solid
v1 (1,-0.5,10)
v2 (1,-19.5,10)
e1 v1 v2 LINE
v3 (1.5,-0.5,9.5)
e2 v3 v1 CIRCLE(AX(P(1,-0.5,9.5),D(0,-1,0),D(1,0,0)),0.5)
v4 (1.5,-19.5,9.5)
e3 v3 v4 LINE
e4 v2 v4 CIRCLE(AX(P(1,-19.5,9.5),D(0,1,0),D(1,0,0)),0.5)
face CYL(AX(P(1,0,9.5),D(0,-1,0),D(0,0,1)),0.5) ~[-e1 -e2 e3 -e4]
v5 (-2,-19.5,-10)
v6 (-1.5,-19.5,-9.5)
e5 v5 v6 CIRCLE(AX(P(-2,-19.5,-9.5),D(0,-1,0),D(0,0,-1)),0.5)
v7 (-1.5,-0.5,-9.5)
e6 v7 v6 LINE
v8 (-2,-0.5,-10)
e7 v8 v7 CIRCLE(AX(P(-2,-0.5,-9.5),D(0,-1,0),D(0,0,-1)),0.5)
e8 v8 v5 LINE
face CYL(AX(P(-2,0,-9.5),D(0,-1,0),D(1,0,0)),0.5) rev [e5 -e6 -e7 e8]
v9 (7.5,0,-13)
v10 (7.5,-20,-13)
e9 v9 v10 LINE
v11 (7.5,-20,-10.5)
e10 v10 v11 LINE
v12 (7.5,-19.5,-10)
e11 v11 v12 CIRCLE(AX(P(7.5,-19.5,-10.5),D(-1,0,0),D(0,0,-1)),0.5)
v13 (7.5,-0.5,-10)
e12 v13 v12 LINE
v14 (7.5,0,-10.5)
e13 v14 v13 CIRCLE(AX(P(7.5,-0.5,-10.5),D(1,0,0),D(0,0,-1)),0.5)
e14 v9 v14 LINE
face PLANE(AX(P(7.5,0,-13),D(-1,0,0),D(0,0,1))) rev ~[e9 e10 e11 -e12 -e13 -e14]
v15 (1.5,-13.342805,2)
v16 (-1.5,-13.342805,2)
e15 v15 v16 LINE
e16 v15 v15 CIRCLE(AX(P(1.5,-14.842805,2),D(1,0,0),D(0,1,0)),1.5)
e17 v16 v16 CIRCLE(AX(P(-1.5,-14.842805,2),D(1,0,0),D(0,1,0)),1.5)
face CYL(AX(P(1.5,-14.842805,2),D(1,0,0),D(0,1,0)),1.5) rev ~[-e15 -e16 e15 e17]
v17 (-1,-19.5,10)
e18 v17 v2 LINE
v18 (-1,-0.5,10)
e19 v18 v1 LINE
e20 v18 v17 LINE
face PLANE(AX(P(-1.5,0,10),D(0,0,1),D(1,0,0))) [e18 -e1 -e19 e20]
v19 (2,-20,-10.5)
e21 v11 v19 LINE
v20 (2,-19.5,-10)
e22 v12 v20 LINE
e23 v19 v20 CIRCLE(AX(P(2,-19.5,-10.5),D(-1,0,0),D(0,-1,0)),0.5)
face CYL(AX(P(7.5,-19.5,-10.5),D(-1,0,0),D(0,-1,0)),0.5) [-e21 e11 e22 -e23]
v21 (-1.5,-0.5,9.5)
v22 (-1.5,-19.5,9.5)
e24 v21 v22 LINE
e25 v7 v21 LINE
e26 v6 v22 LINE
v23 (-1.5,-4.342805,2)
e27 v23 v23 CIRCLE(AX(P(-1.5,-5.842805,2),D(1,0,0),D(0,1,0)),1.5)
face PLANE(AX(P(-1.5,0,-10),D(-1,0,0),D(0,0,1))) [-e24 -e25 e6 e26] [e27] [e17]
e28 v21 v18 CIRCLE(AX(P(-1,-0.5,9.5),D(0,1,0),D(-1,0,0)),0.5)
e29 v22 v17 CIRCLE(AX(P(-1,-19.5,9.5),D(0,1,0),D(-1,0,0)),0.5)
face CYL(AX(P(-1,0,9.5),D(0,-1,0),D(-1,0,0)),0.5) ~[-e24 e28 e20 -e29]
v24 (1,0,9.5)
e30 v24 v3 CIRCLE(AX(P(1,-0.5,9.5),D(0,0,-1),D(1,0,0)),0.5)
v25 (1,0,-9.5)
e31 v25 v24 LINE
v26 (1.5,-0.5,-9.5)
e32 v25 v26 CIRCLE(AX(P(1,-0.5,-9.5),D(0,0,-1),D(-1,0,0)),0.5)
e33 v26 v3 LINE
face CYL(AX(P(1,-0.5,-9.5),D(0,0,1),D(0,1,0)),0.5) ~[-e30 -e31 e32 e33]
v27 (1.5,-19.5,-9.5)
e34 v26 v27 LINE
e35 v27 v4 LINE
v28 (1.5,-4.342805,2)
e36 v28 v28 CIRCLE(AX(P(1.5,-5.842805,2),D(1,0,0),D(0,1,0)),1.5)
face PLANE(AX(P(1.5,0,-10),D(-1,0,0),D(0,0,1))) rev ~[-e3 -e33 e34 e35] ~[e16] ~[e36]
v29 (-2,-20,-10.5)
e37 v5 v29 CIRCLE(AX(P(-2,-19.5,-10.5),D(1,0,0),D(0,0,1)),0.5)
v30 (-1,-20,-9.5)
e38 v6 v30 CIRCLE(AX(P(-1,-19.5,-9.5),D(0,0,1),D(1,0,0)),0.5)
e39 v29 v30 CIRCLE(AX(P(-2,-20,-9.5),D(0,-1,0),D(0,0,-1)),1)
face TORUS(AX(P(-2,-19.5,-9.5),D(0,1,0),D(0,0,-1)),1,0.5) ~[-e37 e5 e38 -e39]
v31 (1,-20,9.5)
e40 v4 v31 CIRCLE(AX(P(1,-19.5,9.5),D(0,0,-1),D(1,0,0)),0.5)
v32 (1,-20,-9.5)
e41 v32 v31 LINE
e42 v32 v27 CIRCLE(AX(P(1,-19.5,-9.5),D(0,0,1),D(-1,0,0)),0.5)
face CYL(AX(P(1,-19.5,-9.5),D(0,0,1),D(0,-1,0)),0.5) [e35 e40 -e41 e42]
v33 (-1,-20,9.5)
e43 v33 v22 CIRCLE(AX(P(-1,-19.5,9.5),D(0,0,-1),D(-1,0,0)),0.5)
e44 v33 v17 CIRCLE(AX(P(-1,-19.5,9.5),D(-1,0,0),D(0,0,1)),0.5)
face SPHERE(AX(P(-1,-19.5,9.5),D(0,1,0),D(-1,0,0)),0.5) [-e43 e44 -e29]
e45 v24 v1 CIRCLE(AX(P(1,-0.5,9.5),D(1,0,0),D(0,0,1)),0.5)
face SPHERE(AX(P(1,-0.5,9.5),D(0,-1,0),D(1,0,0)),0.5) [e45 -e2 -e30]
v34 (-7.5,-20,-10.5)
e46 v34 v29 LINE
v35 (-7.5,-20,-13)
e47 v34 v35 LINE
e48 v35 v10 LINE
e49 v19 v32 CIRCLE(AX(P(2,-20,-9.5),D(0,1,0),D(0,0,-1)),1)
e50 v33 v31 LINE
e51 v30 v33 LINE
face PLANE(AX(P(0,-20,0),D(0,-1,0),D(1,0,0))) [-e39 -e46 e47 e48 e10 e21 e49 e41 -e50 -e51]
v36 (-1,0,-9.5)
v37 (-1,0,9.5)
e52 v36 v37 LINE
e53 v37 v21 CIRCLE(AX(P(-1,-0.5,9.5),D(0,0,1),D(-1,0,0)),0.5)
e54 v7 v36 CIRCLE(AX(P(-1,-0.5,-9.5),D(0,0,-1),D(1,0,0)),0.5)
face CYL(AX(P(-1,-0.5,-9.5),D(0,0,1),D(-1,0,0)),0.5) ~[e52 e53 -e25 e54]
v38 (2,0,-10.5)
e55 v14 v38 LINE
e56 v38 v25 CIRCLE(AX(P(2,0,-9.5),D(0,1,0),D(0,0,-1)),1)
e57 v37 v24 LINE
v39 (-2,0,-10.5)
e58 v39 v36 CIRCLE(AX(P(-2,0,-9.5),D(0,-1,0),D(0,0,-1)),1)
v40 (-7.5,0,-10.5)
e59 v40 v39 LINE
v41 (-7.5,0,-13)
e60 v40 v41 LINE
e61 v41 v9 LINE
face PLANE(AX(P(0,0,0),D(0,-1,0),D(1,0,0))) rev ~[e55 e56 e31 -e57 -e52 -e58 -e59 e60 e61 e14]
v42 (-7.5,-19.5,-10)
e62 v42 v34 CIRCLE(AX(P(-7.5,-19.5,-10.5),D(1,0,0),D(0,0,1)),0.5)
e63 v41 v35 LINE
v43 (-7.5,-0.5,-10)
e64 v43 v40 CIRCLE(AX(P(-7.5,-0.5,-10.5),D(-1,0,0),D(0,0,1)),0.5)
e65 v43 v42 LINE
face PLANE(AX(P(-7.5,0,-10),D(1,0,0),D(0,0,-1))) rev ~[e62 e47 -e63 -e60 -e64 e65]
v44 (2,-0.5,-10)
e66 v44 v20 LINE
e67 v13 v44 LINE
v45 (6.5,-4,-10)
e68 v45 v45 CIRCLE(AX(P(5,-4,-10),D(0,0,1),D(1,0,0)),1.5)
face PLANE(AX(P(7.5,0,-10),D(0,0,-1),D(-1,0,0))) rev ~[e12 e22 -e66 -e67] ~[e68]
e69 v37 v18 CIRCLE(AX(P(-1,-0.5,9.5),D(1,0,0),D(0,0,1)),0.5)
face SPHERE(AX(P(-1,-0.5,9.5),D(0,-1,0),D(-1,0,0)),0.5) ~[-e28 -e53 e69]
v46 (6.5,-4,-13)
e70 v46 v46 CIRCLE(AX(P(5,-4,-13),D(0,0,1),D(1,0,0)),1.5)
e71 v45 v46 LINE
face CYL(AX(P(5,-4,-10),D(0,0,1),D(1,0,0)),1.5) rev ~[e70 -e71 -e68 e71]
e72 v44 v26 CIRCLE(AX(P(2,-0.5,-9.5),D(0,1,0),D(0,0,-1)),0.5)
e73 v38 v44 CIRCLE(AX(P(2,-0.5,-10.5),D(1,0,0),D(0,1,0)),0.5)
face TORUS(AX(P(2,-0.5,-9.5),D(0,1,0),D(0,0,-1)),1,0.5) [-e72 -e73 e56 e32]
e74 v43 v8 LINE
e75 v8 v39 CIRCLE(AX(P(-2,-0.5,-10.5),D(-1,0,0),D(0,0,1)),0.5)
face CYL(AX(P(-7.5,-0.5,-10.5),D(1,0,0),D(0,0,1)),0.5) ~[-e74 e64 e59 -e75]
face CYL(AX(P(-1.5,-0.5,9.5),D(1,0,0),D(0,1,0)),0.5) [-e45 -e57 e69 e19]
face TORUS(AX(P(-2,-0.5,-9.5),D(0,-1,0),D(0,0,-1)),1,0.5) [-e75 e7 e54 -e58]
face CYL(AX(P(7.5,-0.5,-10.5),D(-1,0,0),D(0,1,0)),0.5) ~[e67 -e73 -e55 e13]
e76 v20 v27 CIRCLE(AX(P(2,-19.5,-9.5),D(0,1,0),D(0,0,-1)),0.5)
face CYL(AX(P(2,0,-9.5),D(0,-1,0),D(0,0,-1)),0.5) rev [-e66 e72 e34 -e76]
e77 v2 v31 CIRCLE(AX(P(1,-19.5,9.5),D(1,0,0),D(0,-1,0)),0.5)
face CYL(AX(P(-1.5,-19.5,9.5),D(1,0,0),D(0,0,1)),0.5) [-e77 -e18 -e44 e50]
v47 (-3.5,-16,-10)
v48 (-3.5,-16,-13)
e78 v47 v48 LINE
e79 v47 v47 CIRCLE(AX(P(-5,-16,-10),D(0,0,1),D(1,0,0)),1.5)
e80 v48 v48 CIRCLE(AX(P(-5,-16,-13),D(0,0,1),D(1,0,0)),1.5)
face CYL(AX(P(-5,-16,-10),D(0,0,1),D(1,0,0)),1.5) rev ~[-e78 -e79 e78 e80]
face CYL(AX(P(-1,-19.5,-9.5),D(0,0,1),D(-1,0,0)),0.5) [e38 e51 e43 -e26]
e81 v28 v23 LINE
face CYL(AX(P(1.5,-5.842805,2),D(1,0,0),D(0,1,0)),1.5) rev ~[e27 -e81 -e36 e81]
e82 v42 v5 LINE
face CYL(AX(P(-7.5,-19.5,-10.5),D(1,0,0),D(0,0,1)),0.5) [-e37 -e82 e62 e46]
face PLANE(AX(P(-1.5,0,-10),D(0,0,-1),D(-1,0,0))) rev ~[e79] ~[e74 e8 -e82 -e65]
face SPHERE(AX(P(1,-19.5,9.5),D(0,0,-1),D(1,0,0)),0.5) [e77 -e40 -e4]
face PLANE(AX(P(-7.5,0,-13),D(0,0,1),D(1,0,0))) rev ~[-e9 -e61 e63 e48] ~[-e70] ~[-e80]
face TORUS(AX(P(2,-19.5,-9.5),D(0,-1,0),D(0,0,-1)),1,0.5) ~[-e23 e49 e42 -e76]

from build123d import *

# Parameters (mm, degrees)
F0_W     = 3
F0_H     = 20
F1_DEPTH = 20
F2_R     = 1.5
F3_DEPTH = 9.001
F4_R     = 1.5
F5_DEPTH = 3.001
F6_R     = 1.5
F7_DEPTH = 25
F8_F1_R  = 0.5
F8_F2_R  = 0.5


with BuildPart() as f1:
    # F0 (on Front) → F1 (new body)
    with BuildSketch(Plane.XZ):
        Rectangle(F0_W, F0_H)
        Polygon((7.5, -10), (1.5, -10), (-1.5, -10), (-7.5, -10), (-7.5, -13), (7.5, -13), align=None)
    extrude(amount=F1_DEPTH)

    # F2 (on face) → F3 (cut, through all)
    with BuildSketch(Plane.YZ.offset(1.5)):
        with Locations((-14.8428049088, 2)):
            Circle(F2_R)
        with Locations((-5.8428049088, 2)):
            Circle(F2_R)
    extrude(amount=-F3_DEPTH, mode=Mode.SUBTRACT)

    # F4 (on face) → F5 (cut, through all)
    with BuildSketch(Plane.XY.offset(-10)):
        with Locations((5, -4)):
            Circle(F4_R)
    extrude(amount=-F5_DEPTH, mode=Mode.SUBTRACT)

    # F6 (on face) → F7 (cut)
    with BuildSketch(Plane.XY.offset(-10)):
        with Locations((-5, -16)):
            Circle(F6_R)
    extrude(amount=-F7_DEPTH, mode=Mode.SUBTRACT)

    # F8: fillet of radius 0.5 on 10 edges, made by hand

    # F8_f1
    f8_f1_edges = [f1.edges().sort_by_distance(p)[0] for p in [
        (1.5, -10, -10),
        (-1.5, -10, -10),
    ]]
    fillet(f8_f1_edges, radius=F8_F1_R)

    # F8_f2
    f8_f2_edges = [f1.edges().sort_by_distance(p)[0] for p in [
        (-1.5, -10, 10),
        (1.5, -20, 0.25),
        (-1.5, -20, 0.25),
        (1.5, -10, 10),
        (-1.5, 0, 0.25),
        (1.5, 0, 0.25),
        (0, -20, 10),
        (0, 0, 10),
        (1.6464466094, 0, -9.8535533906),
        (-1.6464466094, 0, -9.8535533906),
        (-1.6464466094, -20, -9.8535533906),
        (1.6464466094, -20, -9.8535533906),
    ]]
    fillet(f8_f2_edges, radius=F8_F2_R)


solid = f1.part
